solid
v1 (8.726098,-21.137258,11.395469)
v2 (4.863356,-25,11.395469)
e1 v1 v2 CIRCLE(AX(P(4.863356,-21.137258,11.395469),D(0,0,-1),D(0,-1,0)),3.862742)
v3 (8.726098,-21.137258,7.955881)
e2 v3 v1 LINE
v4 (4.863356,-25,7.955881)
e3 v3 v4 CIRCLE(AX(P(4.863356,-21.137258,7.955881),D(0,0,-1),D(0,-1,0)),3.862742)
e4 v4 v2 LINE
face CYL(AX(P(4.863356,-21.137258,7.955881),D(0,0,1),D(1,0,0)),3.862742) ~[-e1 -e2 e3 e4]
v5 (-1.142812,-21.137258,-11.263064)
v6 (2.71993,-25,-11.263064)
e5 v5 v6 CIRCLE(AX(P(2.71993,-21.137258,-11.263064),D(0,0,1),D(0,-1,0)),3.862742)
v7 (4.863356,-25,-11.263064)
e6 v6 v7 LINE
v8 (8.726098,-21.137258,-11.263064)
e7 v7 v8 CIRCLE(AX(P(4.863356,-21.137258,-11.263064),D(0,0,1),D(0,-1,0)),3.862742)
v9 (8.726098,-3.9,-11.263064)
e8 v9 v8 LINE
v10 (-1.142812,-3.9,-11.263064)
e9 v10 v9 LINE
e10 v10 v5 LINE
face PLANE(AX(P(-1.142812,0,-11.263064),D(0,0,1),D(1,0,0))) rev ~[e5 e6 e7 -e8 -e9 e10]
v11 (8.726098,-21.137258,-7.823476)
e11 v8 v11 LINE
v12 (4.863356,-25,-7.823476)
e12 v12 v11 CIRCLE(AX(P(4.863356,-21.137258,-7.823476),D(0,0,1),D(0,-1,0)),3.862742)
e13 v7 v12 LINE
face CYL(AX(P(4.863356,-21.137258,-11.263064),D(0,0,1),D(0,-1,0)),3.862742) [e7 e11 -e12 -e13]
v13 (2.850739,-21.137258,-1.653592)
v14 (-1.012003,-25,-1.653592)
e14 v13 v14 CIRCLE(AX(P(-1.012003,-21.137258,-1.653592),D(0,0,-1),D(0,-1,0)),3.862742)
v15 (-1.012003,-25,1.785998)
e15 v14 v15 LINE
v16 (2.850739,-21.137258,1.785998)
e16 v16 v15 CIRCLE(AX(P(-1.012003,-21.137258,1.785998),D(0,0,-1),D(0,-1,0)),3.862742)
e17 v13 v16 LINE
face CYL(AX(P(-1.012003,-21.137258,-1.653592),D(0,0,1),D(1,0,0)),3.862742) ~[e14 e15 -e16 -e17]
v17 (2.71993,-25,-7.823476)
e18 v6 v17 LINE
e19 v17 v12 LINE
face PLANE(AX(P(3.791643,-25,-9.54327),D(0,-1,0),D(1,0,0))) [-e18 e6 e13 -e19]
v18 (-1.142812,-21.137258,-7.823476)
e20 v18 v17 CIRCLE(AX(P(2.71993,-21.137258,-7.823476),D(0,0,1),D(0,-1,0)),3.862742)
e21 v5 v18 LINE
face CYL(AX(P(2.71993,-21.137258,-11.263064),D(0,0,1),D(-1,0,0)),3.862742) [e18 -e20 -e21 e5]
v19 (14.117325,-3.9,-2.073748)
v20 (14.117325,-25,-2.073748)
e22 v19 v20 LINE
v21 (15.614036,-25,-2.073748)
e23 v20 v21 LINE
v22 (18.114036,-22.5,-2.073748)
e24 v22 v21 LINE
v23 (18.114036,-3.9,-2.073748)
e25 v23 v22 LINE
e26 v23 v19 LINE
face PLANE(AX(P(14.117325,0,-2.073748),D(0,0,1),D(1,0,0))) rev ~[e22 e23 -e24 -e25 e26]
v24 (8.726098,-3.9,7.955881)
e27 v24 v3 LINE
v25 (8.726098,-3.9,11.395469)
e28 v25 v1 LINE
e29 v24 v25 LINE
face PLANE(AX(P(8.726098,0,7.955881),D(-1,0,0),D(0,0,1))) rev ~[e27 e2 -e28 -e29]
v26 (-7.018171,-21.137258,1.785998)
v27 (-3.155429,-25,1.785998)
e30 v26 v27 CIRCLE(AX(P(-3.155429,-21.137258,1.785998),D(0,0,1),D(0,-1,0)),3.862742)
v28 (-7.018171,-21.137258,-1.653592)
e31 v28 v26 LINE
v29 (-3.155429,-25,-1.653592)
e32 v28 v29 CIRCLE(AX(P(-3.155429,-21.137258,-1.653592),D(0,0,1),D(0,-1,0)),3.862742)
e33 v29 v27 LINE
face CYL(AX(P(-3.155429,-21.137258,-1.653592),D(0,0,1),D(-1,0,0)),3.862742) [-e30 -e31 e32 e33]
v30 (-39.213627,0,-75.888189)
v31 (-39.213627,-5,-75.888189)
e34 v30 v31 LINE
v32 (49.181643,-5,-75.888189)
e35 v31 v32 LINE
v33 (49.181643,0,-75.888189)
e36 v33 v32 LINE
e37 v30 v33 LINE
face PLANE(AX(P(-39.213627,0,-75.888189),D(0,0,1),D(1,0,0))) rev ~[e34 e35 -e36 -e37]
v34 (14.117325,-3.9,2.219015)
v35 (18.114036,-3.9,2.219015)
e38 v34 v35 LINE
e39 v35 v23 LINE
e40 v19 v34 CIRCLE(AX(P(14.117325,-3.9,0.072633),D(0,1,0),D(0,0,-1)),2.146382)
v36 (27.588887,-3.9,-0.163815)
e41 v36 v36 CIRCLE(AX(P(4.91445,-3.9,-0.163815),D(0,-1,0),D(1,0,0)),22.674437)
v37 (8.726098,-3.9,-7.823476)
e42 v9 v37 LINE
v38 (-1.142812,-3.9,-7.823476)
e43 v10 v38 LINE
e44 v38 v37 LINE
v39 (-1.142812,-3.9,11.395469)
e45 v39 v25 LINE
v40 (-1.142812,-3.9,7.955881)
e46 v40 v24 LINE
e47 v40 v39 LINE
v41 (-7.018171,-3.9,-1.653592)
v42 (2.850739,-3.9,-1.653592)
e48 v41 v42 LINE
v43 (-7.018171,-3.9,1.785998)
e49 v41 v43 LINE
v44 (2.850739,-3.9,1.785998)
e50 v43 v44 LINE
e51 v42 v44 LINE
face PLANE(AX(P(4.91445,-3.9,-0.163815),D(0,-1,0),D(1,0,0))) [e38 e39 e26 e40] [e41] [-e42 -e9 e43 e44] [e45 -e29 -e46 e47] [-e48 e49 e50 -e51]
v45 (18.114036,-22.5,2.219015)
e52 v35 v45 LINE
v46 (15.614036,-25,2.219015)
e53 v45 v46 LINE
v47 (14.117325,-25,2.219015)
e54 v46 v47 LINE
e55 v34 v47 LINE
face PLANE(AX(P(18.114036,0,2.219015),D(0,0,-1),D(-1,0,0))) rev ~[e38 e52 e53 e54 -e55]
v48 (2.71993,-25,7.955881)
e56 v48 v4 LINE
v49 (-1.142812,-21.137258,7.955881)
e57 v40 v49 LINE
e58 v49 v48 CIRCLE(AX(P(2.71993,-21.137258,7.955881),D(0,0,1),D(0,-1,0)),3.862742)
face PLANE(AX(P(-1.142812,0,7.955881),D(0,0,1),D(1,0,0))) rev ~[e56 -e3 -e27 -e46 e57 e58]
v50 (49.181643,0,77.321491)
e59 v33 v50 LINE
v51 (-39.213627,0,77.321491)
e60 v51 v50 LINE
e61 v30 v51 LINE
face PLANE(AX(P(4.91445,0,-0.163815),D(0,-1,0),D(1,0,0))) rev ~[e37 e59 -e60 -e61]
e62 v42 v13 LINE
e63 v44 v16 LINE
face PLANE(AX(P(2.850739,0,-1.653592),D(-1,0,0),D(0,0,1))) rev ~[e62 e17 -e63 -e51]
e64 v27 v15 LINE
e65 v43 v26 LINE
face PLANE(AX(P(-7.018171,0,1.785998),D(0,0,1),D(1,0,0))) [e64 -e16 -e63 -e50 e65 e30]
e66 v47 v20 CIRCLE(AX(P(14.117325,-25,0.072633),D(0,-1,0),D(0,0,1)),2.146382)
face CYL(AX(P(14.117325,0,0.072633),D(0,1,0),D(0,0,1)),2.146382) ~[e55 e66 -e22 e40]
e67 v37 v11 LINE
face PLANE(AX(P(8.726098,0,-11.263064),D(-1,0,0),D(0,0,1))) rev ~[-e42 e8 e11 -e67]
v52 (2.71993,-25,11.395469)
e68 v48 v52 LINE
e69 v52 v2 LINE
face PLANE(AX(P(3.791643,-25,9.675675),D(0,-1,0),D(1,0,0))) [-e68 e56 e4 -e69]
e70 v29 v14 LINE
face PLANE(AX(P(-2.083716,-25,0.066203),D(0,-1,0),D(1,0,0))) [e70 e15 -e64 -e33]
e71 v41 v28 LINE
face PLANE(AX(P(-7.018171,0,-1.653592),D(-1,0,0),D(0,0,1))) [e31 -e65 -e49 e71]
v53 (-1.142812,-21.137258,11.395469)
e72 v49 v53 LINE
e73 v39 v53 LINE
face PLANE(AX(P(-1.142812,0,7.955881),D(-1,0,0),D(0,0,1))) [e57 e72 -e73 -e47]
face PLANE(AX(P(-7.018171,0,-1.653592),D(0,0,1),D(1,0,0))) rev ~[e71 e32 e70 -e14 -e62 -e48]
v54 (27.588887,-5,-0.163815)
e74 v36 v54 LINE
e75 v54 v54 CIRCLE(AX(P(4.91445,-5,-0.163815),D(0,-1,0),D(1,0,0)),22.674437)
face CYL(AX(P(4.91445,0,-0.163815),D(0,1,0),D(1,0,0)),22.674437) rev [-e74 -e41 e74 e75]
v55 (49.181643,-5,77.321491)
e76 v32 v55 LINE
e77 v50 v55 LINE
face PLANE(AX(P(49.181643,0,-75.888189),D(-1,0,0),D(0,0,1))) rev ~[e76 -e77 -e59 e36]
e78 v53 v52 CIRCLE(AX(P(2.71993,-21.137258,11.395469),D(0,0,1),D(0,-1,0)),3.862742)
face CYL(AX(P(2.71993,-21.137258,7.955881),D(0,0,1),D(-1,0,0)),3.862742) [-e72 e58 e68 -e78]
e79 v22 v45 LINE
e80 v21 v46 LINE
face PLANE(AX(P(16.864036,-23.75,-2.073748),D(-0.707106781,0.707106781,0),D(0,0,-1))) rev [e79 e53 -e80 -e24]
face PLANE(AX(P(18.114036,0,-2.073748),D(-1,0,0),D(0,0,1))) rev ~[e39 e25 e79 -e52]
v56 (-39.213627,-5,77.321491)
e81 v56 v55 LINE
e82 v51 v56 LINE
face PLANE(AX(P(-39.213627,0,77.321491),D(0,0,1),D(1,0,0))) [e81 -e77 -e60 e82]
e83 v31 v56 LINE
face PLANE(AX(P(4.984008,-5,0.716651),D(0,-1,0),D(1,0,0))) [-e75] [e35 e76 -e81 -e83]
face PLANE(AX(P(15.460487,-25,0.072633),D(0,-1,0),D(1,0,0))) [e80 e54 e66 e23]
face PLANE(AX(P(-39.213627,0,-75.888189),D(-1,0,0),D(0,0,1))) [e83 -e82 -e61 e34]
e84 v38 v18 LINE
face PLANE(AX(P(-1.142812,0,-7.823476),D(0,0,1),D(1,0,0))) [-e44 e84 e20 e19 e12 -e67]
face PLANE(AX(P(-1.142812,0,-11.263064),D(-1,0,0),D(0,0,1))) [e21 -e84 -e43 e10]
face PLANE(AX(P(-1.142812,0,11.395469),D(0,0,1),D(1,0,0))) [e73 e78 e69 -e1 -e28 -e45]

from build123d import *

# Parameters (mm, degrees)
F0_W     = 88.39527
F0_H     = 153.20968
F0_R     = 22.6744372739
F1_DEPTH = 5
F0_W_2   = 9.8689098377
F0_H_2   = 3.4395875409
F0_W_3   = 9.86891
F0_H_3   = 3.43959
F2_DEPTH = 3.9
F3_DEPTH = 25
F4_R     = 3.8627416998
F5_SIZE  = 2.5


# Not quite as in the source:
# - a feature names something its author has since deleted; it is built from what else it names


with BuildPart() as f1:
    # F0 (on Front) → F1 (new body)
    with BuildSketch(Plane.XZ):
        with Locations((4.9840081745, 0.7166508444)):
            Rectangle(F0_W, F0_H)
        with Locations((4.9144495279, -0.1638149843)):
            Circle(F0_R, mode=Mode.SUBTRACT)
    extrude(amount=F1_DEPTH)

    # F0 (on Front) → F2 (join)
    with BuildSketch(Plane.XZ):
        with Locations((4.9144495279, -0.1638149843)):
            Circle(F0_R)
        with Locations((3.791642841, -9.5432697745)):
            Rectangle(F0_W_2, F0_H_2, mode=Mode.SUBTRACT)
        with Locations((-2.0837161803, 0.0662026977)):
            Rectangle(F0_W_3, F0_H_3, mode=Mode.SUBTRACT)
        with BuildLine():
            Line((18.1140358327, 2.2190151321), (18.1140358327, -2.0737481719))
            Line((18.1140358327, -2.0737481719), (14.117325074, -2.0737481719))
            ThreePointArc((14.117325074, -2.0737481719), (11.9709434221, 0.0726334801), (14.117325074, 2.2190151321))
            Line((14.117325074, 2.2190151321), (18.1140358327, 2.2190151321))
        make_face(mode=Mode.SUBTRACT)
        with Locations((3.791642841, 9.6756751699)):
            Rectangle(F0_W_2, F0_H_2, mode=Mode.SUBTRACT)
    extrude(amount=F2_DEPTH)

    # F0 (on Front) → F3 (join)
    with BuildSketch(Plane.XZ):
        with Locations((3.791642841, -9.5432697745)):
            Rectangle(F0_W_2, F0_H_2)
        with Locations((-2.0837161803, 0.0662026977)):
            Rectangle(F0_W_3, F0_H_3)
        with Locations((3.791642841, 9.6756751699)):
            Rectangle(F0_W_2, F0_H_2)
        with BuildLine():
            Line((14.117325074, -2.0737481719), (18.1140358327, -2.0737481719))
            Line((18.1140358327, -2.0737481719), (18.1140358327, 2.2190151321))
            Line((18.1140358327, 2.2190151321), (14.117325074, 2.2190151321))
            ThreePointArc((14.117325074, 2.2190151321), (11.9709434221, 0.0726334801), (14.117325074, -2.0737481719))
        make_face()
    extrude(amount=F3_DEPTH)

    # F4
    f4_edges = [f1.edges().sort_by_distance(p)[0] for p in [
        (-1.142812, -25, -9.54327),
        (8.726098, -25, -9.54327),
        (-7.018171, -25, 0.066203),
        (2.850739, -25, 0.066203),
        (8.726098, -25, 9.675675),
        (-1.142812, -25, 9.675675),
    ]]
    fillet(f4_edges, radius=F4_R)

    # F5
    f5_edges = [f1.edges().sort_by_distance(p)[0] for p in [
        (18.114036, -25, 0.072633),
    ]]
    chamfer(f5_edges, length=F5_SIZE)


solid = f1.part
